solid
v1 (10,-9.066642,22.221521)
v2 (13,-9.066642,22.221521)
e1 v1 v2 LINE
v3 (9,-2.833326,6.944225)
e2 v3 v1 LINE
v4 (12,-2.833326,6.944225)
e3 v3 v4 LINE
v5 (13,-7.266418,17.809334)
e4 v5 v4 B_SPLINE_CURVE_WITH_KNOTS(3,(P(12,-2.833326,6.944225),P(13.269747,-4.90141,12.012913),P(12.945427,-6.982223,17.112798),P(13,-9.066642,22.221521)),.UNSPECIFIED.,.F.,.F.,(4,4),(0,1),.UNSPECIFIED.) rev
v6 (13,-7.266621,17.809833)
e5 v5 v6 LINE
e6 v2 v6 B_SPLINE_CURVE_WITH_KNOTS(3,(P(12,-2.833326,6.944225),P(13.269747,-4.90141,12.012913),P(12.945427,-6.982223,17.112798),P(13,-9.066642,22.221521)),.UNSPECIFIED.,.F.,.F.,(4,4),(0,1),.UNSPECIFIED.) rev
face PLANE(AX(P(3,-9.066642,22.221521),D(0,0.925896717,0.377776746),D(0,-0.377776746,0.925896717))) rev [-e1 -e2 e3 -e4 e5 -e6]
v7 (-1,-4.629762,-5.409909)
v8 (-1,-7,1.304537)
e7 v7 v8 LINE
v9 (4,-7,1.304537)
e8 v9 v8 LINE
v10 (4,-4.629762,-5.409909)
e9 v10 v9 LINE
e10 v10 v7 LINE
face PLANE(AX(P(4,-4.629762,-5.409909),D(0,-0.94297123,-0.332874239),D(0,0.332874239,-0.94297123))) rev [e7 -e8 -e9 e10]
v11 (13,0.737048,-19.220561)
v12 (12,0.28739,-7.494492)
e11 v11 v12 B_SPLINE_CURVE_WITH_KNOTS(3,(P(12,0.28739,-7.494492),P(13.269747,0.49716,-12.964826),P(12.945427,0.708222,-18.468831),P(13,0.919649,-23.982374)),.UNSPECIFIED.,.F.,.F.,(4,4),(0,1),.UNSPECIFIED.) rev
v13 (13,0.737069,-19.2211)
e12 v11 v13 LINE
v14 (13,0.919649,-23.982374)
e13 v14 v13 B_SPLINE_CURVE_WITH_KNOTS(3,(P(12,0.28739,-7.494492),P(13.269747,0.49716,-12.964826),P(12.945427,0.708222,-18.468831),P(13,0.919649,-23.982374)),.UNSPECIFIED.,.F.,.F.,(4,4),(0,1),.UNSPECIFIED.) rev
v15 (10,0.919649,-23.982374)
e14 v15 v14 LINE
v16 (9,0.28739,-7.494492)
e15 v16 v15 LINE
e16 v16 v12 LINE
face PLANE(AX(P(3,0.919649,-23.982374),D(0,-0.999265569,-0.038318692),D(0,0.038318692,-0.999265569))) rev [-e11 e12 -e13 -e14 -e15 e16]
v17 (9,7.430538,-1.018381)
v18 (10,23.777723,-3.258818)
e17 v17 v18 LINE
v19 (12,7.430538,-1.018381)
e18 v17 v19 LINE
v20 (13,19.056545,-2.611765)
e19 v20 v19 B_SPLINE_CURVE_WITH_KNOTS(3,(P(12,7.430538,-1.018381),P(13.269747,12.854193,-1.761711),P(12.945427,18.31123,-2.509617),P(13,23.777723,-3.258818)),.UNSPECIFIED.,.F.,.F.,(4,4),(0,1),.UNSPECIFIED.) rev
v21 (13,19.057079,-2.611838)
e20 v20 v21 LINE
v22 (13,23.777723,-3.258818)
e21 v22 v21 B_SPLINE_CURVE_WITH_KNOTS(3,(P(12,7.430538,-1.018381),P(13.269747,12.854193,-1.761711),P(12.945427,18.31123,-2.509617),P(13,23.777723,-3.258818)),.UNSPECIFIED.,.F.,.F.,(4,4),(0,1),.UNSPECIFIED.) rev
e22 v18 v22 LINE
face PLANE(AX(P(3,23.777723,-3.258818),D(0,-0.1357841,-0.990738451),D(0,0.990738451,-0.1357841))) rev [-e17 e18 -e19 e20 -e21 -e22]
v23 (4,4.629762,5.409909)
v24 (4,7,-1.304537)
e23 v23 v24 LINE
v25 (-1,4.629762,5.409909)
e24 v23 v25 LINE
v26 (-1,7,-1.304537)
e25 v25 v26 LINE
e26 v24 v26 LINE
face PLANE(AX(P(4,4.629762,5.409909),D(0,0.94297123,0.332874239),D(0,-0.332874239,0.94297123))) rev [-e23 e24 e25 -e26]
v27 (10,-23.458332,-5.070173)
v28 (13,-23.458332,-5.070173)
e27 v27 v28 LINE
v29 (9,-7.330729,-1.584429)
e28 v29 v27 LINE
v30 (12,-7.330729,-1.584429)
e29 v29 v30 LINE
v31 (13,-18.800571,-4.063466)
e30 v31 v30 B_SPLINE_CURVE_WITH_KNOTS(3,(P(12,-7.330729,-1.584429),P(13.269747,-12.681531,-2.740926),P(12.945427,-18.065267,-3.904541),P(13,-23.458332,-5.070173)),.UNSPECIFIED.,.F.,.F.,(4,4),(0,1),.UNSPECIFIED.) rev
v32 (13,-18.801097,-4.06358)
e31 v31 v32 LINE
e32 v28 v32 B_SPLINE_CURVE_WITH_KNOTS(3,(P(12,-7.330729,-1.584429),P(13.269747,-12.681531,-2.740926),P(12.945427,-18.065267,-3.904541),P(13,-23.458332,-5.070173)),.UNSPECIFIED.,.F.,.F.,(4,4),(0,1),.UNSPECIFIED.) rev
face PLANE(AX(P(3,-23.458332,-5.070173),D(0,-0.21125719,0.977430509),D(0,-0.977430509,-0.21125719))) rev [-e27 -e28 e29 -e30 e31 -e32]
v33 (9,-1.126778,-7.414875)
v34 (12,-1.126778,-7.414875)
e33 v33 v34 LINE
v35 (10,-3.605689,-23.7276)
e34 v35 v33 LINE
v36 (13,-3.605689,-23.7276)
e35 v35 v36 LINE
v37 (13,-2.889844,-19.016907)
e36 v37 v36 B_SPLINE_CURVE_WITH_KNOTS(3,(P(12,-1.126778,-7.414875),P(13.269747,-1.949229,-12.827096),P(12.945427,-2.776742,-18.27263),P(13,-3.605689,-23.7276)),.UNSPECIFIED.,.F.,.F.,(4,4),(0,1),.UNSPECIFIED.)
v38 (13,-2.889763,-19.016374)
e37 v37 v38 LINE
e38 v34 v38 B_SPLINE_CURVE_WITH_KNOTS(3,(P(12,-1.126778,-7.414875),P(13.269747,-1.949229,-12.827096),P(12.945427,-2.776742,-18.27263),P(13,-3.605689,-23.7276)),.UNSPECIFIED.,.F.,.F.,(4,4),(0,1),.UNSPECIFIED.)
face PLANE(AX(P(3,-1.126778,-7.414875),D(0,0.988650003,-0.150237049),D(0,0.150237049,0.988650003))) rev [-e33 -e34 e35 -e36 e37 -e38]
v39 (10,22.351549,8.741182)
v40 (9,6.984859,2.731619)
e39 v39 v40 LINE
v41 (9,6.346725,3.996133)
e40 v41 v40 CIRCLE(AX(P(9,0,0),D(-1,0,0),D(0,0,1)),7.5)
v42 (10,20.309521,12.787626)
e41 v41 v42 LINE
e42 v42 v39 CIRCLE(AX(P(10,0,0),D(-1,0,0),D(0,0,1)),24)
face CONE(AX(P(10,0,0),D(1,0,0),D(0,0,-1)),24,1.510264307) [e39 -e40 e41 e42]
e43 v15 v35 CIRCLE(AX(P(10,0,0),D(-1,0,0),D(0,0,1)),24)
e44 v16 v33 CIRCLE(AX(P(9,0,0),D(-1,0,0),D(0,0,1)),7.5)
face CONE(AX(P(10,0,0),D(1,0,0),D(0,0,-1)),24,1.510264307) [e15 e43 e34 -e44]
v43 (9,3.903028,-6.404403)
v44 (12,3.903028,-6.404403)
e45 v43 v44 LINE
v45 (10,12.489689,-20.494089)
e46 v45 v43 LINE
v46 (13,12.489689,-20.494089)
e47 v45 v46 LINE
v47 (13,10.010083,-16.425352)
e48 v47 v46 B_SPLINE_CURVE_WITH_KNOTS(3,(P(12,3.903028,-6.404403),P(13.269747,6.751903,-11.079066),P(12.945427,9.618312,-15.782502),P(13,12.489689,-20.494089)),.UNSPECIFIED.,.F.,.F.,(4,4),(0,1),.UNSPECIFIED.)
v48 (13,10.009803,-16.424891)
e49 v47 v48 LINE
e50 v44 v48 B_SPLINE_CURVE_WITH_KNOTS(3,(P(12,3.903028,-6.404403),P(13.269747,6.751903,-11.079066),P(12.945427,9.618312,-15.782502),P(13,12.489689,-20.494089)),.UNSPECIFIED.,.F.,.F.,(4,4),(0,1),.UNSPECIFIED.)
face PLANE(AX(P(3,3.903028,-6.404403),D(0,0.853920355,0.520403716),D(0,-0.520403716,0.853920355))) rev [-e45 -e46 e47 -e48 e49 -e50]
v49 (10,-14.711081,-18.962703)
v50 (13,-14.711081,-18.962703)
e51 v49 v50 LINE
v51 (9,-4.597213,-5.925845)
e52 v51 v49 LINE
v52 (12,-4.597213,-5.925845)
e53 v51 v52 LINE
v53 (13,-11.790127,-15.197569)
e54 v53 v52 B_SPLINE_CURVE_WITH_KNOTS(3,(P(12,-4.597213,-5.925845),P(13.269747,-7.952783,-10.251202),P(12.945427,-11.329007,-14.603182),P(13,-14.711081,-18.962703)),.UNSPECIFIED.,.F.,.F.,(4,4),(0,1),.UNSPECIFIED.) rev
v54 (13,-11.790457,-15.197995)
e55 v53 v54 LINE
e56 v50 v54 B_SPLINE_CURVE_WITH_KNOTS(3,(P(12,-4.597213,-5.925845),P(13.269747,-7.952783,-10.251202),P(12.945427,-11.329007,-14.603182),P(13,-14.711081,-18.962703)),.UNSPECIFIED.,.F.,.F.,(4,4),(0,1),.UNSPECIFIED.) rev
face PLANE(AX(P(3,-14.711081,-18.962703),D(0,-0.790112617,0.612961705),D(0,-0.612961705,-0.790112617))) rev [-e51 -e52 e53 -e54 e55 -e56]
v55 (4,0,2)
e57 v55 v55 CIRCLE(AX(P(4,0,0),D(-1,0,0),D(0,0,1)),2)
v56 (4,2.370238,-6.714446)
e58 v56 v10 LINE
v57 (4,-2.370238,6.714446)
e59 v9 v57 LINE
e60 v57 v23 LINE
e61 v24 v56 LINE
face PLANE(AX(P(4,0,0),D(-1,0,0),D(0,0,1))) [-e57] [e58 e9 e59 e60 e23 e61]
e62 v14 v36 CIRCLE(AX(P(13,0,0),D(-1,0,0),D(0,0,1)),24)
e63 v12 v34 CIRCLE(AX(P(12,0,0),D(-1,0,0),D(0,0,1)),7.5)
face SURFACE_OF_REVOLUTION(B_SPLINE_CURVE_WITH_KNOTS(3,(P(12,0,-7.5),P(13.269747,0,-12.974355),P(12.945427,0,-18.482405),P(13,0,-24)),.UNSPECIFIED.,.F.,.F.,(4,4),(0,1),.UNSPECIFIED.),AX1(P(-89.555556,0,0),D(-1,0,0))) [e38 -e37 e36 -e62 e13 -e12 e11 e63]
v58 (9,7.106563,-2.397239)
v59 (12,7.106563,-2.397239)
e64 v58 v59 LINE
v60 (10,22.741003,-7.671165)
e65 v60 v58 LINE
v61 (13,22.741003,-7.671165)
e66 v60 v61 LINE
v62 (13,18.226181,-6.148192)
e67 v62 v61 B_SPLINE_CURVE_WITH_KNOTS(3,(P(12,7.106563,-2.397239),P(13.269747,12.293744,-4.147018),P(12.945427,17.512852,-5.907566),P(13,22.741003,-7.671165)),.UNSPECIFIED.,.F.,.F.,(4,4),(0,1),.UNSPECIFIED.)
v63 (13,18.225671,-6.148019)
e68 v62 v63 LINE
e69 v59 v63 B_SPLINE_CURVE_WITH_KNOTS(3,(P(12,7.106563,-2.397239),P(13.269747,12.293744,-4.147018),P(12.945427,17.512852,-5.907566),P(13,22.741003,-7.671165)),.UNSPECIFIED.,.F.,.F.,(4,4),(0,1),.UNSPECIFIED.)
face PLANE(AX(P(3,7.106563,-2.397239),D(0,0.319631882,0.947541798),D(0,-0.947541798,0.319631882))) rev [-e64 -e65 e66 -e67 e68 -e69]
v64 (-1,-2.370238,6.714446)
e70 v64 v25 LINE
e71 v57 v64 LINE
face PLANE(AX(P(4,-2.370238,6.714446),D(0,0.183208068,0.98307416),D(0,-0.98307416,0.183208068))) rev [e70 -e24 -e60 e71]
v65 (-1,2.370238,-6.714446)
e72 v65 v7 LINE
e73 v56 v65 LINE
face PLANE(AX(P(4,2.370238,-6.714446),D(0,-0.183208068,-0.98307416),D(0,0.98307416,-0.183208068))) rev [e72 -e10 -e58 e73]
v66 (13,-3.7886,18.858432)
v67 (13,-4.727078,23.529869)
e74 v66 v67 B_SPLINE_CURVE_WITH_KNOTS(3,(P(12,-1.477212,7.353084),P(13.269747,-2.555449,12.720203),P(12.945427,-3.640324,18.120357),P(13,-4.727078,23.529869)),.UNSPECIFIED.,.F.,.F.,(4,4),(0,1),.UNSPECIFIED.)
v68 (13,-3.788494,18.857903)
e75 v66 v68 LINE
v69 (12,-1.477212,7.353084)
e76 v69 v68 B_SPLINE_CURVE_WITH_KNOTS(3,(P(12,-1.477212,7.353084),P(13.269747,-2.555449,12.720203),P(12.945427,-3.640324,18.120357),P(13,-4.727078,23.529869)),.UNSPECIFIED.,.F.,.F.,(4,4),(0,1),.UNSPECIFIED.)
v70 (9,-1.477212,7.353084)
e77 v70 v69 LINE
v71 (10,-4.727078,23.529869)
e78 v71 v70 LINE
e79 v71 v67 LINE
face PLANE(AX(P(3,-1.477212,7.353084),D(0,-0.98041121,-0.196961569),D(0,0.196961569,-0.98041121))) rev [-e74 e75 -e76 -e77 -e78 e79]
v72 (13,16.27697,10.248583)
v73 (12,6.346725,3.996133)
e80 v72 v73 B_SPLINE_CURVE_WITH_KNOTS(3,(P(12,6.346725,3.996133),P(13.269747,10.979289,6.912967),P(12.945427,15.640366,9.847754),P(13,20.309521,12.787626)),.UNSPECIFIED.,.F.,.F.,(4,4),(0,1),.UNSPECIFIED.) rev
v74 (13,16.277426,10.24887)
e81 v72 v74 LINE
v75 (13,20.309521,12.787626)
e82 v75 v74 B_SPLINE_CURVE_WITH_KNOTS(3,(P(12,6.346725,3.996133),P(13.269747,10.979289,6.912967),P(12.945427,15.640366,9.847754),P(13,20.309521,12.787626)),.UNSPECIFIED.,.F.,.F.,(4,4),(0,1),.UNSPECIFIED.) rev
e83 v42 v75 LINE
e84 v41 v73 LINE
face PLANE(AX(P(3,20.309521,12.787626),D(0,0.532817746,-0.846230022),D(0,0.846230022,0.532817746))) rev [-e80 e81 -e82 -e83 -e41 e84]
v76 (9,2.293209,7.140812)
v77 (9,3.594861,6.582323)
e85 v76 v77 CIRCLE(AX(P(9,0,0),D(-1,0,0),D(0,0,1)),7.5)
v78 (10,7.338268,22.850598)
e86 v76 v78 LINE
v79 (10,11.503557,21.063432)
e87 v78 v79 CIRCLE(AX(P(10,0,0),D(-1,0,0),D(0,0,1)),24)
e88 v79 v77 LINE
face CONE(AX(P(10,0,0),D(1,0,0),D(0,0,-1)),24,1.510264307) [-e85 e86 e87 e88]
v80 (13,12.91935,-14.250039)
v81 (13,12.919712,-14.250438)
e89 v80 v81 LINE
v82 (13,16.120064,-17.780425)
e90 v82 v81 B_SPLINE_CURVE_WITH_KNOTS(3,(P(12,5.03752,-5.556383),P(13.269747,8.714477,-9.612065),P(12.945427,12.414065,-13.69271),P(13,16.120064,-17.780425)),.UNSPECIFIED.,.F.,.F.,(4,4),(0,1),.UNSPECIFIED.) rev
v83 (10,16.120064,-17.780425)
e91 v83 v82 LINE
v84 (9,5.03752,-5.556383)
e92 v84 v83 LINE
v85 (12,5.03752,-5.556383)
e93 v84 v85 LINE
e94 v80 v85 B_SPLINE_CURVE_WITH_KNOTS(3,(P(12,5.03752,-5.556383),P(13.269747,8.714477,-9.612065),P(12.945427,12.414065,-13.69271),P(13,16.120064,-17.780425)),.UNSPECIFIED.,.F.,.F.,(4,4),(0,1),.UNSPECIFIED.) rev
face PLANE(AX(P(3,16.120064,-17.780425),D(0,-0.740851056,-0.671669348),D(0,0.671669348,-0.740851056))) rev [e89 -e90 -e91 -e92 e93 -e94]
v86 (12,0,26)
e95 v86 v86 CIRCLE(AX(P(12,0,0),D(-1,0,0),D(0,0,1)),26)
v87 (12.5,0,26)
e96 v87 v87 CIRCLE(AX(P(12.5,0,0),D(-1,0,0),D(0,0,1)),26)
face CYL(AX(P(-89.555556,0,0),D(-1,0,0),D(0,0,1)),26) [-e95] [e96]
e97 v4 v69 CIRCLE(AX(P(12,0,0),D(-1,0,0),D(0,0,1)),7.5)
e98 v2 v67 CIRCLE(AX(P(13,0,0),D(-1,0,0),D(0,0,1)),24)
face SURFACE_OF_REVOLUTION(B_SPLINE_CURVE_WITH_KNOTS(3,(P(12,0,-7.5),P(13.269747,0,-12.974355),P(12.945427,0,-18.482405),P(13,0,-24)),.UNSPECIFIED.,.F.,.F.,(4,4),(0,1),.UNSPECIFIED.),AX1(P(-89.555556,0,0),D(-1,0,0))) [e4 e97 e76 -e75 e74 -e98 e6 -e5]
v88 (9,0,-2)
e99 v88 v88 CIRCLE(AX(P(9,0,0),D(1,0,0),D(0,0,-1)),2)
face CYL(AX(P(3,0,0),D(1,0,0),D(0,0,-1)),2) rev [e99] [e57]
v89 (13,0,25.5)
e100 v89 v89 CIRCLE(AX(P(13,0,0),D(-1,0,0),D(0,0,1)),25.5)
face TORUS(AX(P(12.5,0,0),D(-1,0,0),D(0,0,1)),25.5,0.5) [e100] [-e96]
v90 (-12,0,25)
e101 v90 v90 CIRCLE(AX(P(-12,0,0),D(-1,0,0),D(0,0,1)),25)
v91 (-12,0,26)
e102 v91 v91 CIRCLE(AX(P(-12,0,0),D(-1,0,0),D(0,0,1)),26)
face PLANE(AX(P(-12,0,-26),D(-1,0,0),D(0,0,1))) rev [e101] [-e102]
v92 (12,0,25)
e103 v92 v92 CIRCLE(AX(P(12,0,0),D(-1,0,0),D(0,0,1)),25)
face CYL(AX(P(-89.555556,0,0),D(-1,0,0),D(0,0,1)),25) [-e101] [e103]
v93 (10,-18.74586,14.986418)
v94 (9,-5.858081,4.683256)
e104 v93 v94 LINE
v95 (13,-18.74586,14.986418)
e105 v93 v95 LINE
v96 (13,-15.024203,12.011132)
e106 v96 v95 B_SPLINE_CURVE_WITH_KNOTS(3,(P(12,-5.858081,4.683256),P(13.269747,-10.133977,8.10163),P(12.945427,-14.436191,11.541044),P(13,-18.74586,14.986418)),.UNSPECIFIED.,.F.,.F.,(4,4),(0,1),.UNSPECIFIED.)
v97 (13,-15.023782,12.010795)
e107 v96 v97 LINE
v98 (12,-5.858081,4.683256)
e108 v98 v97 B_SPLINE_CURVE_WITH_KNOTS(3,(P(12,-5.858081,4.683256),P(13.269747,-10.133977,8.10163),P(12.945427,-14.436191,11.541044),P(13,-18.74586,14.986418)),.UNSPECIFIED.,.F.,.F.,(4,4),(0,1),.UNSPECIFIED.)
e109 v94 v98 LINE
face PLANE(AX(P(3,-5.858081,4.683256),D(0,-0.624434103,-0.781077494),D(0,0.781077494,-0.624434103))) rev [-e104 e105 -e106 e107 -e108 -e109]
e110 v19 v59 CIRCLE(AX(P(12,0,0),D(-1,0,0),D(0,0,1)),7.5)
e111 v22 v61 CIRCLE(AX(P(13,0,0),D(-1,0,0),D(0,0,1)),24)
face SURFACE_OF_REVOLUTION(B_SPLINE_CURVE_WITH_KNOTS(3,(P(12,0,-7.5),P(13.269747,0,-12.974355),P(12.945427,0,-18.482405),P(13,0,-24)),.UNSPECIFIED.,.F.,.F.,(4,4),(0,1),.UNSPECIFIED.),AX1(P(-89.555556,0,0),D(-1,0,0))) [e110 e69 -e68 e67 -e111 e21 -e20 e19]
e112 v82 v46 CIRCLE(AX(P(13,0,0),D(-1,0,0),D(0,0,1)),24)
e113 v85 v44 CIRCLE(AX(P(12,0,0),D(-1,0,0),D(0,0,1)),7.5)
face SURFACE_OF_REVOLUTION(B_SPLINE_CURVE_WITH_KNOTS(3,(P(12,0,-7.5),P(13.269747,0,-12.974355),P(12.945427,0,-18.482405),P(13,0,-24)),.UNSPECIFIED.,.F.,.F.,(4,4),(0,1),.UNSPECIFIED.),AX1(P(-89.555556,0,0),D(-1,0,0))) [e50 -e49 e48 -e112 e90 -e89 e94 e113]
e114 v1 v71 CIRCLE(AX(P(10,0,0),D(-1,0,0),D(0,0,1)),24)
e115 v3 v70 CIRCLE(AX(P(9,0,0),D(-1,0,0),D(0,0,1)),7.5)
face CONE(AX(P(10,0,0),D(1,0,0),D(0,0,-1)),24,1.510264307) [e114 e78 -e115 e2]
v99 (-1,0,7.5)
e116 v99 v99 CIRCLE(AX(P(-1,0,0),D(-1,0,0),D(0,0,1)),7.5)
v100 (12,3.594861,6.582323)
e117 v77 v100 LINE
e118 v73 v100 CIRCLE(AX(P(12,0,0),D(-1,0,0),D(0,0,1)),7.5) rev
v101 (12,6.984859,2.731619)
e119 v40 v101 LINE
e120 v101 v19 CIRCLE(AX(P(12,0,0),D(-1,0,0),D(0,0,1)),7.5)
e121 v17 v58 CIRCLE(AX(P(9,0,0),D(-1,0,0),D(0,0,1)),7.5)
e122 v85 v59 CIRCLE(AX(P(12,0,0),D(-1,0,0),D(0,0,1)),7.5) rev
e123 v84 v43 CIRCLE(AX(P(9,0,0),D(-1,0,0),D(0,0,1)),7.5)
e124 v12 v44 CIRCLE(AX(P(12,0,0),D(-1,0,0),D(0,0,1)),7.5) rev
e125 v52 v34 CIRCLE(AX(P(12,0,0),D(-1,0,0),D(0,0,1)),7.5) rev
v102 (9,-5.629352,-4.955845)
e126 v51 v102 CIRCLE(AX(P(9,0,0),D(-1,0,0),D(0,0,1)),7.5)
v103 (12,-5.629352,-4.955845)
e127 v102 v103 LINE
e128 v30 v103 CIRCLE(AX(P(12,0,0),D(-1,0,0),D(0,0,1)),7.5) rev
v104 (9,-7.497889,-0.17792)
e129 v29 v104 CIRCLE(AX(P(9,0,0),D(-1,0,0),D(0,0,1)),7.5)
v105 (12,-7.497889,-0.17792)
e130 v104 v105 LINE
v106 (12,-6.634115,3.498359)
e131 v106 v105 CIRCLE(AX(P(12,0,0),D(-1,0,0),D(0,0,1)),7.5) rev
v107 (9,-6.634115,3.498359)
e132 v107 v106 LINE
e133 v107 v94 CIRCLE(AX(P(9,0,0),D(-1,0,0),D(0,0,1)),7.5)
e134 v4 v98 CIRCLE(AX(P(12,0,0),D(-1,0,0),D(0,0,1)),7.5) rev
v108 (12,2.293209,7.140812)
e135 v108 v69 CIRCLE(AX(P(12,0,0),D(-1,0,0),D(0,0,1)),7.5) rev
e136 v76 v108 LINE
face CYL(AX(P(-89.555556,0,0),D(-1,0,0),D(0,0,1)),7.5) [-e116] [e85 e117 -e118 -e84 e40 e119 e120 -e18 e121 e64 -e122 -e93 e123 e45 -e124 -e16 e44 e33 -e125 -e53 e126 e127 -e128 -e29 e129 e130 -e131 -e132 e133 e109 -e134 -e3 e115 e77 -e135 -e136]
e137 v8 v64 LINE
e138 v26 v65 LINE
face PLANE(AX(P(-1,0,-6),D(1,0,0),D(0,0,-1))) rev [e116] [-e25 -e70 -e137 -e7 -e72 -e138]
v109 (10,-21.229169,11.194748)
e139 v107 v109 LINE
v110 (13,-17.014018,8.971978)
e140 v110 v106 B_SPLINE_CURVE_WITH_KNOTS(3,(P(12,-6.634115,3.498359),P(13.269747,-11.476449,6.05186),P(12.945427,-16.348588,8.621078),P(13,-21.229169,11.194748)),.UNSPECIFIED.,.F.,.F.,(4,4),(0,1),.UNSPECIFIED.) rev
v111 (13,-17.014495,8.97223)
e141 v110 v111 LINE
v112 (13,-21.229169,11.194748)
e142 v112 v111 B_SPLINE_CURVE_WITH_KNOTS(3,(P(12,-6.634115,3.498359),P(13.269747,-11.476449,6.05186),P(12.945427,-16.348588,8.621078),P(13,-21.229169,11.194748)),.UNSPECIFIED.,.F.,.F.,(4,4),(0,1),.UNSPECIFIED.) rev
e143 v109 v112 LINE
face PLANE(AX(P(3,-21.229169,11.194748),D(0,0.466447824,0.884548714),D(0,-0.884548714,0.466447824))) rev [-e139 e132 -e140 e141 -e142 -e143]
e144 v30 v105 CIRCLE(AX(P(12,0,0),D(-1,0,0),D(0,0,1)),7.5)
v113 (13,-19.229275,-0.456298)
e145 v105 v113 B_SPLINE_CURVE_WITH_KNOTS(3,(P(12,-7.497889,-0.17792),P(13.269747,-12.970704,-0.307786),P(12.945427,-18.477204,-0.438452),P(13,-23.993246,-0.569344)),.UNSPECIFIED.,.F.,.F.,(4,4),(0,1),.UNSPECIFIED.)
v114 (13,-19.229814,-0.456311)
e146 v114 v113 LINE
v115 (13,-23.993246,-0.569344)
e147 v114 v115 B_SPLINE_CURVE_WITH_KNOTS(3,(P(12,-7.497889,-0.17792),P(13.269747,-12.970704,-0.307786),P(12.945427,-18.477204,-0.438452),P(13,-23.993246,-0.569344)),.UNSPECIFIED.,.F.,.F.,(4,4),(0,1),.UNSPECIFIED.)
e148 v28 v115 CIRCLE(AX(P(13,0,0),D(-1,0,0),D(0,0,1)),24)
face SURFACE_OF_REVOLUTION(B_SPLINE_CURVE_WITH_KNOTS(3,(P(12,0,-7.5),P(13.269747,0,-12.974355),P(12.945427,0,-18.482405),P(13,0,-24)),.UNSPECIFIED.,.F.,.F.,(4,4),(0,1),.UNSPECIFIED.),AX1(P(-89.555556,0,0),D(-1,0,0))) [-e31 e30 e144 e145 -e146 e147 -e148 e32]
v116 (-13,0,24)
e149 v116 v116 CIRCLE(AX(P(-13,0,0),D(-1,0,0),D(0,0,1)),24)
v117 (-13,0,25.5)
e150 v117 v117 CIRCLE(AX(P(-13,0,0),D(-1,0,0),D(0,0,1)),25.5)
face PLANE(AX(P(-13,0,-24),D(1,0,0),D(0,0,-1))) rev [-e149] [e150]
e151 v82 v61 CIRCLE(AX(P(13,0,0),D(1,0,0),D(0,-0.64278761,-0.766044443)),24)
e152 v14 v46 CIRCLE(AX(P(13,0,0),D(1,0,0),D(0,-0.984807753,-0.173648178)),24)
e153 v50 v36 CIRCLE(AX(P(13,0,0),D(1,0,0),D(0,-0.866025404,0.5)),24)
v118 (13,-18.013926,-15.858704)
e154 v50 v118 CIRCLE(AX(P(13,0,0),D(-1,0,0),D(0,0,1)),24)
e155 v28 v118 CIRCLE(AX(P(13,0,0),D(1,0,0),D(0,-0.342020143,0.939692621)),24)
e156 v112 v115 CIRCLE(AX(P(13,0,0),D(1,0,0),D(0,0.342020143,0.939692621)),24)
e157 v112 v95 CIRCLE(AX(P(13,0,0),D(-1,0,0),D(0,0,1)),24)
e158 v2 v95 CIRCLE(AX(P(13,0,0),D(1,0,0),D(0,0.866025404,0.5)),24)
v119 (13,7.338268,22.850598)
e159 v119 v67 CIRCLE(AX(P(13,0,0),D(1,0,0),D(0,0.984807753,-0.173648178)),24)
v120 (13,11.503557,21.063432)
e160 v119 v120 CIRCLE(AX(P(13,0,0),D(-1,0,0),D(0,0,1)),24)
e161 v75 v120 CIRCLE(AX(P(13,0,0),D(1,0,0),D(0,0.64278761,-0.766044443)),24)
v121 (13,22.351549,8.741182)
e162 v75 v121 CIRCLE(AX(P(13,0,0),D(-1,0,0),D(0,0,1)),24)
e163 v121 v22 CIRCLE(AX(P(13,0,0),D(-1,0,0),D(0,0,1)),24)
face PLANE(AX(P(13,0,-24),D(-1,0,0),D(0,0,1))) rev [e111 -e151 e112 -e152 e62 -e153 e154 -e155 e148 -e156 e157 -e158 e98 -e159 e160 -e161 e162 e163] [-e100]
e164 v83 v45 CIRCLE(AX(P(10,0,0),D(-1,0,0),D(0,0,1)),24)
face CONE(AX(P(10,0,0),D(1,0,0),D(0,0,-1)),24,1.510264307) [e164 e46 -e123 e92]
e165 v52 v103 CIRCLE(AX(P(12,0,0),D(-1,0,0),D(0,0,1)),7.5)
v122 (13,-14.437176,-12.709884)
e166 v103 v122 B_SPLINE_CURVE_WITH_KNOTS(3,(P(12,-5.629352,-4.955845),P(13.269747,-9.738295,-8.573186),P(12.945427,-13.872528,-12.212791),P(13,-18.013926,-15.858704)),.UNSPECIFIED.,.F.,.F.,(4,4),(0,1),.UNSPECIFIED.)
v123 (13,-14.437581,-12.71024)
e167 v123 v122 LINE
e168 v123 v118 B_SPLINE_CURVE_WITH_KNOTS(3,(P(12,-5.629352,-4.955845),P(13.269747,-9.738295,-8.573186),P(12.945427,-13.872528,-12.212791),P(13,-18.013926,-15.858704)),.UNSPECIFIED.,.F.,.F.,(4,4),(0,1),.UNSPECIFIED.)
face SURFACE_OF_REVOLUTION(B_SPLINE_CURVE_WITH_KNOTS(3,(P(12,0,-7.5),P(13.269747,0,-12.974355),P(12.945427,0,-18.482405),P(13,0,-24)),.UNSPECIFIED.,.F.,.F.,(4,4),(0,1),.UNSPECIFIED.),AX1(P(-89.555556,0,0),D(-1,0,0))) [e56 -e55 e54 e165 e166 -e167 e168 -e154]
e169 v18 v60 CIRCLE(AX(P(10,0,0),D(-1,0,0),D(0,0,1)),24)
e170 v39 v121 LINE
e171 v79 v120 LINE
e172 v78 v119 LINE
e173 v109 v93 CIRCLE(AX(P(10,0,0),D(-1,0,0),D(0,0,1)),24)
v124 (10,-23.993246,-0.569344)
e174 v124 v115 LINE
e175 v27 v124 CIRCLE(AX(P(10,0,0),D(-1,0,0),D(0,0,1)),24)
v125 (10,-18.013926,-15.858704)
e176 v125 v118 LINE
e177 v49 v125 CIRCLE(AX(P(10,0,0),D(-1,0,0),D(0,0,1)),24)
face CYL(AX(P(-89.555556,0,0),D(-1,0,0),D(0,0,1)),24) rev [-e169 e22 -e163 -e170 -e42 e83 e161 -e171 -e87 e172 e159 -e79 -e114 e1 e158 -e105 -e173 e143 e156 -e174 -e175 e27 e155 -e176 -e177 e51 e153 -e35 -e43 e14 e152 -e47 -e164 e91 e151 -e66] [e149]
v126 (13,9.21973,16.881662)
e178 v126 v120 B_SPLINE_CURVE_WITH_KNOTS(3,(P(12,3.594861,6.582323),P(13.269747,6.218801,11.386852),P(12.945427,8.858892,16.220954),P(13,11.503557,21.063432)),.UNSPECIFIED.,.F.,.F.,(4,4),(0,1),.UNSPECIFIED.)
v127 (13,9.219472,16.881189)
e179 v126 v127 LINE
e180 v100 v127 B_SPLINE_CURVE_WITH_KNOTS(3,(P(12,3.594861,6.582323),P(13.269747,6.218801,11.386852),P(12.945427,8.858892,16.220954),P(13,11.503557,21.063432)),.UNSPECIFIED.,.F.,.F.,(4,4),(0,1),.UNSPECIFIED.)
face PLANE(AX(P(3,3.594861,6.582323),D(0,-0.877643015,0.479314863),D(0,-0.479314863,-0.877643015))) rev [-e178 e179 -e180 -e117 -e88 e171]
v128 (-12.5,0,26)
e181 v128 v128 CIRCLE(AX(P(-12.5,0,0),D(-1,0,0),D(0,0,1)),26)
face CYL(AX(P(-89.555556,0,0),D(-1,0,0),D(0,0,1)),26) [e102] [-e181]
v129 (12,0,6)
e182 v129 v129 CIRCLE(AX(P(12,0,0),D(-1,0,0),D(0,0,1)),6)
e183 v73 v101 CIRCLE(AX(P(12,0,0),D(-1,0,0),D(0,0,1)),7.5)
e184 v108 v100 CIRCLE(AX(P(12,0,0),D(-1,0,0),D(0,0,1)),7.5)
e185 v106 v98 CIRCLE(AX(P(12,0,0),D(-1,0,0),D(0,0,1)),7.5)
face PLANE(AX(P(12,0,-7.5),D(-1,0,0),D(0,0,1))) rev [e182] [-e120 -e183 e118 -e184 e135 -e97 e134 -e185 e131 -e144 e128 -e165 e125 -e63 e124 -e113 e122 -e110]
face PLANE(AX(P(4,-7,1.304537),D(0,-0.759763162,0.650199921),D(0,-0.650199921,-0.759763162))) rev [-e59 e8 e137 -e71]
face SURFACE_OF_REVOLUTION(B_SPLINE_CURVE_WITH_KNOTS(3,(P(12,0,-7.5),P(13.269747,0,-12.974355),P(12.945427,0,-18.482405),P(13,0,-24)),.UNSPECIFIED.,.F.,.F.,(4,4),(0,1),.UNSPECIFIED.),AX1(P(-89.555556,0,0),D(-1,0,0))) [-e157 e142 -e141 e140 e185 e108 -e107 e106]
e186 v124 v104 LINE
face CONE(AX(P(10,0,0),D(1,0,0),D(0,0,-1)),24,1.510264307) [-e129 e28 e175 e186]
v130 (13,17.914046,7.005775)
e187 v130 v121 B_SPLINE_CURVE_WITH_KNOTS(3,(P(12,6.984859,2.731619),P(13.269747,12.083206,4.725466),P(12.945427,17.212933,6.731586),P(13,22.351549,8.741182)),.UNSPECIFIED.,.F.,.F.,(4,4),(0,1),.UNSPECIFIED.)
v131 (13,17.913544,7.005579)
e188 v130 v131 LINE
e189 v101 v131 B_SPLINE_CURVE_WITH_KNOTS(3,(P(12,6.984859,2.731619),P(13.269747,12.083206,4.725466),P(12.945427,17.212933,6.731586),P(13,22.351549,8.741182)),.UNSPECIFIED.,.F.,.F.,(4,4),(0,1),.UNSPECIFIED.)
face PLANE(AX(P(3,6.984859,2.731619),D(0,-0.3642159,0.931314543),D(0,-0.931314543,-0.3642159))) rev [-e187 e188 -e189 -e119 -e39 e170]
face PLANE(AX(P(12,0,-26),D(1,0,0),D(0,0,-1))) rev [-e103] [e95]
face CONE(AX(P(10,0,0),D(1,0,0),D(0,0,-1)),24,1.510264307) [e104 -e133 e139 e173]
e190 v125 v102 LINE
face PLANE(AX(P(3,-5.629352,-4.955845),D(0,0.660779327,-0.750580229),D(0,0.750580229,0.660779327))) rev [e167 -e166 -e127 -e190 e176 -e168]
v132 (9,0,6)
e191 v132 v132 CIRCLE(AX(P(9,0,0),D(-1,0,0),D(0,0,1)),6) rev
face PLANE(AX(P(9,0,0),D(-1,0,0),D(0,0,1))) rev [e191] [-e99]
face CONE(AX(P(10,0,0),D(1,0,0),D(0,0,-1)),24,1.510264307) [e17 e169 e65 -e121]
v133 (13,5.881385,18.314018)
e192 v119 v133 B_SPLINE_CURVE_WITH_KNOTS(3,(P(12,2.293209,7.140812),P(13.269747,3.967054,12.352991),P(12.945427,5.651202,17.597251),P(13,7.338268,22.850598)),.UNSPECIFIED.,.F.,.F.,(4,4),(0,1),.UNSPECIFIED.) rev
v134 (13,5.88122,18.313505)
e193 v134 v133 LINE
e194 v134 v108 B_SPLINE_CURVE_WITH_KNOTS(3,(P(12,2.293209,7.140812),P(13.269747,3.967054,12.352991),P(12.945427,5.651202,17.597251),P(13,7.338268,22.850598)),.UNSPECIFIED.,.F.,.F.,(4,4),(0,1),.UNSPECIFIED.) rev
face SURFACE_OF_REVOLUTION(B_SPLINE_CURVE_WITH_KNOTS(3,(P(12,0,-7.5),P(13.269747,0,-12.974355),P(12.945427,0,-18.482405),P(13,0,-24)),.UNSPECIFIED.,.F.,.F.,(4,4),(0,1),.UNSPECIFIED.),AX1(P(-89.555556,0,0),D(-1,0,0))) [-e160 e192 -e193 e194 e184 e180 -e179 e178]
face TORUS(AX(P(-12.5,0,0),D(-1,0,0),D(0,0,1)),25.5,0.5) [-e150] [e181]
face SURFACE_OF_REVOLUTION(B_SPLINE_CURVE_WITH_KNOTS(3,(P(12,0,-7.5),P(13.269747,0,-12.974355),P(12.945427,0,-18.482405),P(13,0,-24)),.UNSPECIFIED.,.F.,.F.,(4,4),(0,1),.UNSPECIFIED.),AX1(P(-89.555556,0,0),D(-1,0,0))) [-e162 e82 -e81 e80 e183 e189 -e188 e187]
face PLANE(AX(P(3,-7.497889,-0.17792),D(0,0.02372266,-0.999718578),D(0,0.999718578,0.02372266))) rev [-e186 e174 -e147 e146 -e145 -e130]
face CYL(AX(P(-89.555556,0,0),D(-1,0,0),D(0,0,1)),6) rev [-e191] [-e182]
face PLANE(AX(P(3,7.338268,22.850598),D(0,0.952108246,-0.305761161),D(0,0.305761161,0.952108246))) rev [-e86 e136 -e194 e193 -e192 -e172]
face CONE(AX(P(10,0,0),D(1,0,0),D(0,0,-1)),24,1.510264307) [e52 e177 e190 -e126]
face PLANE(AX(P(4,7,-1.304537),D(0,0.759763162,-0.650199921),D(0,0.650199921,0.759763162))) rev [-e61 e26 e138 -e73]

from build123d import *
from build123d.topology import SkipClean

# Parameters (mm, degrees)
CUT_EXTRUDE2_DEPTH  = 10
CIRPATTERN1_COUNT   = 9
CUT_EXTRUDE9_DEPTH  = 5
BOSS_EXTRUDE2_START = -5
SKETCH7_R           = 6
BOSS_EXTRUDE2_DEPTH = 5
SKETCH8_R           = 2
CUT_EXTRUDE10_DEPTH = 6


with BuildPart() as part:
    # Sketch1 → Revolve1 (revolve)
    with BuildSketch(Plane(origin=(0, 0, 0), x_dir=(1, 0, 0), z_dir=(0, 1, 0))):
        with BuildLine():
            Line((-13, 24), (10, 24))
            Line((10, 24), (9, 7.5))
            Line((9, 7.5), (-1, 7.5))
            Line((-1, 7.5), (-1, 6))
            Line((-1, 6), (12, 6))
            Line((12, 6), (12, 7.5))
            add(Edge.make_bspline(
                [(13, 24), (12.945427236, 18.482405329), (13.269747448, 12.974355238), (12, 7.5)],
                knots=[0, 0, 0, 0, 1, 1, 1, 1], degree=3))
            Line((13, 24), (13, 25.5))
            ThreePointArc((13, 25.5), (12.853553391, 25.853553391), (12.5, 26))
            Line((12.5, 26), (12, 26))
            Line((12, 26), (12, 25))
            Line((12, 25), (-12, 25))
            Line((-12, 25), (-12, 26))
            Line((-12, 26), (-12.5, 26))
            ThreePointArc((-12.5, 26), (-12.853553391, 25.853553391), (-13, 25.5))
            Line((-13, 25.5), (-13, 24))
        make_face()
    revolve(axis=Axis((-89.555555556, 0, 0), (1, 0, 0)))

    # Sketch2 → Cut-Extrude2 (cut)
    with SkipClean():  # the faces are left unmerged after this step: merging them gives an invalid solid
        with BuildSketch(Plane(origin=(13, 0, 0), x_dir=(0, 0, -1), z_dir=(1, 0, 0))):
            with BuildLine():
                Line((-2.731619252, 6.984859072), (-8.741181606, 22.351549032))
                ThreePointArc((-8.741181606, 22.351549032), (-2.83241408, 23.832277073), (3.258818394, 23.777722824))
                Line((3.258818394, 23.777722824), (1.018380748, 7.430538382))
                ThreePointArc((1.018380748, 7.430538382), (-0.8851294, 7.447586585), (-2.731619252, 6.984859072))
            make_face()
        cut_extrude2 = extrude(amount=-CUT_EXTRUDE2_DEPTH, mode=Mode.SUBTRACT)
    add(part.part.scale(1), mode=Mode.REPLACE)  # the faces are merged on a copy

    # CirPattern1: Cut-Extrude2 ×9 about axis
    cirpattern1_axis = Axis((12, 0, 0), (-1, 0, 0))
    for i in range(1, CIRPATTERN1_COUNT):
        add(cut_extrude2.rotate(cirpattern1_axis, i * 360 / CIRPATTERN1_COUNT), mode=Mode.SUBTRACT)

    # Sketch6 → Cut-Extrude9 (cut)
    with BuildSketch(Plane.ZY.offset(1)):
        Polygon((-5.409909398, -4.629762059), (1.304536857, -7), (6.714446255, -2.370237941), (5.409909398, 4.629762059), (-1.304536857, 7), (-6.714446255, 2.370237941), align=None)
    extrude(amount=-CUT_EXTRUDE9_DEPTH, mode=Mode.SUBTRACT)

    # Sketch7 → Boss-Extrude2 (add)
    with BuildSketch(Plane.ZY.offset(-4).offset(BOSS_EXTRUDE2_START)):
        Circle(SKETCH7_R)
    extrude(amount=BOSS_EXTRUDE2_DEPTH)

    # Sketch8 → Cut-Extrude10 (cut)
    with SkipClean():  # the faces are left unmerged after this step: merging them gives an invalid solid
        with BuildSketch(Plane(origin=(9, 0, 0), x_dir=(0, 0, -1), z_dir=(1, 0, 0))):
            Circle(SKETCH8_R)
        extrude(amount=-CUT_EXTRUDE10_DEPTH, mode=Mode.SUBTRACT)


solid = part.part
